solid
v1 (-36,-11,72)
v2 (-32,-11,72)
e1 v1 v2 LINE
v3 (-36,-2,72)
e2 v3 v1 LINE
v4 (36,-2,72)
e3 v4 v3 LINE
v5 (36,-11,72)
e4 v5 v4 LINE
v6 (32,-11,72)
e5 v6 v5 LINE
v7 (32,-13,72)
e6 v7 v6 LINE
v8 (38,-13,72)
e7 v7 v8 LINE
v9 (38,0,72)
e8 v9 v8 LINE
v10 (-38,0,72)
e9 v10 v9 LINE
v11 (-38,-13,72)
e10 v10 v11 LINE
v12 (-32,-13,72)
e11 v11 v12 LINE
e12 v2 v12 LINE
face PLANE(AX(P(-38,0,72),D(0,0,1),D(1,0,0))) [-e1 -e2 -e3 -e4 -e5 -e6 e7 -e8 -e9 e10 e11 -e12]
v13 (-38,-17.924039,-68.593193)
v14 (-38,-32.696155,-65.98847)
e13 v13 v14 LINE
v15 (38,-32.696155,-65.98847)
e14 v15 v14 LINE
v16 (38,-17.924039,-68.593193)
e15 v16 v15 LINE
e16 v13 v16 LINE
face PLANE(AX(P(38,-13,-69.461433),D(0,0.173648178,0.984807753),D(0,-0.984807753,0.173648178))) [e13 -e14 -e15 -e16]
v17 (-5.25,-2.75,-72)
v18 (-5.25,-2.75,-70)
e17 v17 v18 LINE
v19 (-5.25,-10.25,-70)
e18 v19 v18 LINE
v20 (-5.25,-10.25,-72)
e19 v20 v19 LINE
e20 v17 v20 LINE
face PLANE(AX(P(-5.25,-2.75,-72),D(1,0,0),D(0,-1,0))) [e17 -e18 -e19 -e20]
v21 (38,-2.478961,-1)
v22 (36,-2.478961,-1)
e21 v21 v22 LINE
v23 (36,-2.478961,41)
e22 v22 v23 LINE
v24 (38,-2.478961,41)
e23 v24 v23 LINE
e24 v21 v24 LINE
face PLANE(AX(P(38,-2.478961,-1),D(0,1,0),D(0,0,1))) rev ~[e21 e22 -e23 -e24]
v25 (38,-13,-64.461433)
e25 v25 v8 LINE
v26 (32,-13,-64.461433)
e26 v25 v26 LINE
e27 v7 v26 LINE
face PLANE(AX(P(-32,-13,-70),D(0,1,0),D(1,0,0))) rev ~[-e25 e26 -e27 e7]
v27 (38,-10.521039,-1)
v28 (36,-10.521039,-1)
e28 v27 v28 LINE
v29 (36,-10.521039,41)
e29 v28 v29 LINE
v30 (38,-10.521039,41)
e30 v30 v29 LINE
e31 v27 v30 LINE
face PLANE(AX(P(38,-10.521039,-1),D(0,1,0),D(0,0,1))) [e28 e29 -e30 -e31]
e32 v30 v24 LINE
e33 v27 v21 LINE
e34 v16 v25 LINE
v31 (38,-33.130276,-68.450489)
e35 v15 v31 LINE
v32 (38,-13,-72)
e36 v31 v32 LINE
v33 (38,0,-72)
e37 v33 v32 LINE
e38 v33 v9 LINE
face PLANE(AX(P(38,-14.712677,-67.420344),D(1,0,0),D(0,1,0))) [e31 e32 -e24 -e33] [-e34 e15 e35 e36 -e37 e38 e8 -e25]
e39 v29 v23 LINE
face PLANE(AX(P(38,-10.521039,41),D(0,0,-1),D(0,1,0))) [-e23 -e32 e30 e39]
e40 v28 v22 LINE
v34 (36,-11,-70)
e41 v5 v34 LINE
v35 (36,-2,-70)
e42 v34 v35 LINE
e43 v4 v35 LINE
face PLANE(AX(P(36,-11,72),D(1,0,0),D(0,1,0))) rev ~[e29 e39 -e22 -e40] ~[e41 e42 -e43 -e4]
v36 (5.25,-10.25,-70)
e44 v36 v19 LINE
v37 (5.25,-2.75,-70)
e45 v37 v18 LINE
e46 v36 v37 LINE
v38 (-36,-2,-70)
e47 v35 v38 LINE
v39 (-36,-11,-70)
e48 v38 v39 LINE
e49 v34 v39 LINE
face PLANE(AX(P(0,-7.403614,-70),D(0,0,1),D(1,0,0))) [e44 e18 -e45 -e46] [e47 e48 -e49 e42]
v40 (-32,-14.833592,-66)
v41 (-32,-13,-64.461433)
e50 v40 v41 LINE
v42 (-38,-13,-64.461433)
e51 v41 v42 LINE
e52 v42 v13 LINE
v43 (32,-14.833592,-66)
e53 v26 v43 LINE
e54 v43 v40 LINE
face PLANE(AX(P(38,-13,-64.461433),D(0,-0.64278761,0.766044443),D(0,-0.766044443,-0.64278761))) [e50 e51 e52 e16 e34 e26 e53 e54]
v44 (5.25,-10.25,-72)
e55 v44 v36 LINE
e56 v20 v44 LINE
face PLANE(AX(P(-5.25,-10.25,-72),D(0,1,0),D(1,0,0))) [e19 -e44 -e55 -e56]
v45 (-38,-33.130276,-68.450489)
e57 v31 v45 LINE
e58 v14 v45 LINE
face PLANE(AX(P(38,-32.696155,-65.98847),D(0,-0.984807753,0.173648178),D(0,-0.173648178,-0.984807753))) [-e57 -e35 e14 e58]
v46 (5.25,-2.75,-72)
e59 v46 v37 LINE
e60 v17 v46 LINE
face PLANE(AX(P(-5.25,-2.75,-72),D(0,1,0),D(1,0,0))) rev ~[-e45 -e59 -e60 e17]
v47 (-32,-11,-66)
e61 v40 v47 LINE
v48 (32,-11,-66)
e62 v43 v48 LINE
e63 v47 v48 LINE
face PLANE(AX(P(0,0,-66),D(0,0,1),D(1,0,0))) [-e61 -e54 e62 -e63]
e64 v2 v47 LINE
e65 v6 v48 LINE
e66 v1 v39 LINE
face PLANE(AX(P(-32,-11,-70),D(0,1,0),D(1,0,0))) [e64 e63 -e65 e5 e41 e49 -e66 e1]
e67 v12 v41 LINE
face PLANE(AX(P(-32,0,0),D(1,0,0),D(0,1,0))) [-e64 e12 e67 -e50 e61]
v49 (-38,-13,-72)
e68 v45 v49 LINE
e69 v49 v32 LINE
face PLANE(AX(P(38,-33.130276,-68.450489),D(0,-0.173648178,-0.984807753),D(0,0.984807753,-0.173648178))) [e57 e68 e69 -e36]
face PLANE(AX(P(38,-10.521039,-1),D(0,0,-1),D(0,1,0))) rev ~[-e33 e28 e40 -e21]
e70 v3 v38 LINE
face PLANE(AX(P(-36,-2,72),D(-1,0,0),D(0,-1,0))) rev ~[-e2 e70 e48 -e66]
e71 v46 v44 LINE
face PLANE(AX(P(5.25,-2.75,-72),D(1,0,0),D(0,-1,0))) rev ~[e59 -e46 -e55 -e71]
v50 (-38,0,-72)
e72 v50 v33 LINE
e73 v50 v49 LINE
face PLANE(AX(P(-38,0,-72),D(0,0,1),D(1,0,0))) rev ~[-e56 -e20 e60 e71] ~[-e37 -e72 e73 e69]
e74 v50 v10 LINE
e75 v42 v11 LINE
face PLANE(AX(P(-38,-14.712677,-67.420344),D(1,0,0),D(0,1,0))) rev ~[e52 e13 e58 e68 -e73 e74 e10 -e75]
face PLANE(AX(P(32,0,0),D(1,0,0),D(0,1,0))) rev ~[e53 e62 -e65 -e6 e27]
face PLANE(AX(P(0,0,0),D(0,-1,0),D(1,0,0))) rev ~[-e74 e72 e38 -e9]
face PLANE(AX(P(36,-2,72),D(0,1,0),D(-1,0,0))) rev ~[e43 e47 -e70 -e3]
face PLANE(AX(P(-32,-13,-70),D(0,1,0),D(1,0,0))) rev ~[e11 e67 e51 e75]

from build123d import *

# Parameters (mm, degrees)
F0_W          = 76
F0_H          = 144
F1_DEPTH      = 13
F3_DEPTH      = 142
F4_W          = 64
F4_H          = 2
F5_DEPTH      = 4
F6_W          = 10.5
F6_H          = 7.5
F7_DEPTH      = 25
F8_W          = 8.0420786627
F8_H          = 42
F9_DEPTH      = 25
F11_DEPTH     = 76
F12_T4_DEPTH  = 76
F12_T10_DEPTH = 76
F12_T16_DEPTH = 76
F12_T23_DEPTH = 76
F12_T29_DEPTH = 76


# Not quite as in the source:
# - a fillet or chamfer that OpenCascade refuses, or shapes differently, is made with other operations: its cross-section is extruded or revolved along the edge and cut away or added


with BuildPart() as f1:
    # F0 (on Front) → F1 (new body)
    with BuildSketch(Plane.XZ):
        Rectangle(F0_W, F0_H)
    extrude(amount=F1_DEPTH)

    # F2 (on face) → F3 (cut)
    with BuildSketch(Plane.XY.offset(72)):
        Polygon((-32, -11), (-32, -13), (32, -13), (32, -11), (36, -11), (36, -2), (-36, -2), (-36, -11), align=None)
    extrude(amount=-F3_DEPTH, mode=Mode.SUBTRACT)

    # F4 (on face) → F5 (join)
    with BuildSketch(Plane.XY.offset(-70)):
        with Locations((0, -12)):
            Rectangle(F4_W, F4_H)
    extrude(amount=F5_DEPTH)

    # F6 (on face) → F7 (cut)
    with BuildSketch(Plane(origin=(0, 0, -72), x_dir=(1, 0, 0), z_dir=(0, 0, -1))):
        with Locations((0, 6.5)):
            Rectangle(F6_W, F6_H)
    extrude(amount=-F7_DEPTH, mode=Mode.SUBTRACT)

    # F8 (on face) → F9 (cut)
    with BuildSketch(Plane.YZ.offset(38)):
        with Locations((-6.5, 20)):
            Rectangle(F8_W, F8_H)
    extrude(amount=-F9_DEPTH, mode=Mode.SUBTRACT)

    # F10 (on face) → F11 (join)
    with BuildSketch(Plane.YZ.offset(38)):
        Polygon((-33.1302755044, -68.4504892995), (-13, -72), (-13, -69.4614334703), (-32.6961550602, -65.9884699169), align=None)
    extrude(amount=-F11_DEPTH)

    # F12: chamfer of 5 on 1 edges, made by hand


with BuildPart() as f12_tool2:
    # F12_s3 → F12_t4 (new body)
    with BuildSketch(Plane.YZ.offset(38)):
        Polygon((-13, -64.4614334703), (-17.9240387651, -68.593192582), (-13, -69.4614334703), align=None)
    extrude(amount=-F12_T4_DEPTH)

    split(bisect_by=Plane.XY.offset(-66), keep=Keep.TOP)

    split(bisect_by=Plane.YZ.offset(32), keep=Keep.TOP)


with BuildPart() as f1_1:
    add(f1.part)

    # F12_t1: union F12_tool2
    add(f12_tool2.part)


with BuildPart() as f12_tool8:
    # F12_s9 → F12_t10 (new body)
    with BuildSketch(Plane.YZ.offset(38)):
        Polygon((-13, -64.4614334703), (-17.9240387651, -68.593192582), (-13, -69.4614334703), align=None)
    extrude(amount=-F12_T10_DEPTH)

    split(bisect_by=Plane.XY.offset(-66), keep=Keep.BOTTOM)

    split(bisect_by=Plane.YZ.offset(32), keep=Keep.TOP)


with BuildPart() as f1_2:
    add(f1_1.part)

    # F12_t7: union F12_tool8
    add(f12_tool8.part)


with BuildPart() as f12_tool14:
    # F12_s15 → F12_t16 (new body)
    with BuildSketch(Plane.YZ.offset(38)):
        Polygon((-13, -64.4614334703), (-17.9240387651, -68.593192582), (-13, -69.4614334703), align=None)
    extrude(amount=-F12_T16_DEPTH)

    split(bisect_by=Plane.YZ.offset(-32), keep=Keep.TOP)

    split(bisect_by=Plane.XY.offset(-66), keep=Keep.BOTTOM)

    split(bisect_by=Plane.YZ.offset(32), keep=Keep.BOTTOM)


with BuildPart() as f1_3:
    add(f1_2.part)

    # F12_t13: union F12_tool14
    add(f12_tool14.part)


with BuildPart() as f12_tool21:
    # F12_s22 → F12_t23 (new body)
    with BuildSketch(Plane.YZ.offset(38)):
        Polygon((-13, -64.4614334703), (-17.9240387651, -68.593192582), (-13, -69.4614334703), align=None)
    extrude(amount=-F12_T23_DEPTH)

    split(bisect_by=Plane.YZ.offset(-32), keep=Keep.BOTTOM)

    split(bisect_by=Plane.XY.offset(-66), keep=Keep.TOP)


with BuildPart() as f1_4:
    add(f1_3.part)

    # F12_t20: union F12_tool21
    add(f12_tool21.part)


with BuildPart() as f12_tool27:
    # F12_s28 → F12_t29 (new body)
    with BuildSketch(Plane.YZ.offset(38)):
        Polygon((-13, -64.4614334703), (-17.9240387651, -68.593192582), (-13, -69.4614334703), align=None)
    extrude(amount=-F12_T29_DEPTH)

    split(bisect_by=Plane.YZ.offset(-32), keep=Keep.BOTTOM)

    split(bisect_by=Plane.XY.offset(-66), keep=Keep.BOTTOM)


with BuildPart() as f1_5:
    add(f1_4.part)

    # F12_t26: union F12_tool27
    add(f12_tool27.part)


solid = f1_5.part
